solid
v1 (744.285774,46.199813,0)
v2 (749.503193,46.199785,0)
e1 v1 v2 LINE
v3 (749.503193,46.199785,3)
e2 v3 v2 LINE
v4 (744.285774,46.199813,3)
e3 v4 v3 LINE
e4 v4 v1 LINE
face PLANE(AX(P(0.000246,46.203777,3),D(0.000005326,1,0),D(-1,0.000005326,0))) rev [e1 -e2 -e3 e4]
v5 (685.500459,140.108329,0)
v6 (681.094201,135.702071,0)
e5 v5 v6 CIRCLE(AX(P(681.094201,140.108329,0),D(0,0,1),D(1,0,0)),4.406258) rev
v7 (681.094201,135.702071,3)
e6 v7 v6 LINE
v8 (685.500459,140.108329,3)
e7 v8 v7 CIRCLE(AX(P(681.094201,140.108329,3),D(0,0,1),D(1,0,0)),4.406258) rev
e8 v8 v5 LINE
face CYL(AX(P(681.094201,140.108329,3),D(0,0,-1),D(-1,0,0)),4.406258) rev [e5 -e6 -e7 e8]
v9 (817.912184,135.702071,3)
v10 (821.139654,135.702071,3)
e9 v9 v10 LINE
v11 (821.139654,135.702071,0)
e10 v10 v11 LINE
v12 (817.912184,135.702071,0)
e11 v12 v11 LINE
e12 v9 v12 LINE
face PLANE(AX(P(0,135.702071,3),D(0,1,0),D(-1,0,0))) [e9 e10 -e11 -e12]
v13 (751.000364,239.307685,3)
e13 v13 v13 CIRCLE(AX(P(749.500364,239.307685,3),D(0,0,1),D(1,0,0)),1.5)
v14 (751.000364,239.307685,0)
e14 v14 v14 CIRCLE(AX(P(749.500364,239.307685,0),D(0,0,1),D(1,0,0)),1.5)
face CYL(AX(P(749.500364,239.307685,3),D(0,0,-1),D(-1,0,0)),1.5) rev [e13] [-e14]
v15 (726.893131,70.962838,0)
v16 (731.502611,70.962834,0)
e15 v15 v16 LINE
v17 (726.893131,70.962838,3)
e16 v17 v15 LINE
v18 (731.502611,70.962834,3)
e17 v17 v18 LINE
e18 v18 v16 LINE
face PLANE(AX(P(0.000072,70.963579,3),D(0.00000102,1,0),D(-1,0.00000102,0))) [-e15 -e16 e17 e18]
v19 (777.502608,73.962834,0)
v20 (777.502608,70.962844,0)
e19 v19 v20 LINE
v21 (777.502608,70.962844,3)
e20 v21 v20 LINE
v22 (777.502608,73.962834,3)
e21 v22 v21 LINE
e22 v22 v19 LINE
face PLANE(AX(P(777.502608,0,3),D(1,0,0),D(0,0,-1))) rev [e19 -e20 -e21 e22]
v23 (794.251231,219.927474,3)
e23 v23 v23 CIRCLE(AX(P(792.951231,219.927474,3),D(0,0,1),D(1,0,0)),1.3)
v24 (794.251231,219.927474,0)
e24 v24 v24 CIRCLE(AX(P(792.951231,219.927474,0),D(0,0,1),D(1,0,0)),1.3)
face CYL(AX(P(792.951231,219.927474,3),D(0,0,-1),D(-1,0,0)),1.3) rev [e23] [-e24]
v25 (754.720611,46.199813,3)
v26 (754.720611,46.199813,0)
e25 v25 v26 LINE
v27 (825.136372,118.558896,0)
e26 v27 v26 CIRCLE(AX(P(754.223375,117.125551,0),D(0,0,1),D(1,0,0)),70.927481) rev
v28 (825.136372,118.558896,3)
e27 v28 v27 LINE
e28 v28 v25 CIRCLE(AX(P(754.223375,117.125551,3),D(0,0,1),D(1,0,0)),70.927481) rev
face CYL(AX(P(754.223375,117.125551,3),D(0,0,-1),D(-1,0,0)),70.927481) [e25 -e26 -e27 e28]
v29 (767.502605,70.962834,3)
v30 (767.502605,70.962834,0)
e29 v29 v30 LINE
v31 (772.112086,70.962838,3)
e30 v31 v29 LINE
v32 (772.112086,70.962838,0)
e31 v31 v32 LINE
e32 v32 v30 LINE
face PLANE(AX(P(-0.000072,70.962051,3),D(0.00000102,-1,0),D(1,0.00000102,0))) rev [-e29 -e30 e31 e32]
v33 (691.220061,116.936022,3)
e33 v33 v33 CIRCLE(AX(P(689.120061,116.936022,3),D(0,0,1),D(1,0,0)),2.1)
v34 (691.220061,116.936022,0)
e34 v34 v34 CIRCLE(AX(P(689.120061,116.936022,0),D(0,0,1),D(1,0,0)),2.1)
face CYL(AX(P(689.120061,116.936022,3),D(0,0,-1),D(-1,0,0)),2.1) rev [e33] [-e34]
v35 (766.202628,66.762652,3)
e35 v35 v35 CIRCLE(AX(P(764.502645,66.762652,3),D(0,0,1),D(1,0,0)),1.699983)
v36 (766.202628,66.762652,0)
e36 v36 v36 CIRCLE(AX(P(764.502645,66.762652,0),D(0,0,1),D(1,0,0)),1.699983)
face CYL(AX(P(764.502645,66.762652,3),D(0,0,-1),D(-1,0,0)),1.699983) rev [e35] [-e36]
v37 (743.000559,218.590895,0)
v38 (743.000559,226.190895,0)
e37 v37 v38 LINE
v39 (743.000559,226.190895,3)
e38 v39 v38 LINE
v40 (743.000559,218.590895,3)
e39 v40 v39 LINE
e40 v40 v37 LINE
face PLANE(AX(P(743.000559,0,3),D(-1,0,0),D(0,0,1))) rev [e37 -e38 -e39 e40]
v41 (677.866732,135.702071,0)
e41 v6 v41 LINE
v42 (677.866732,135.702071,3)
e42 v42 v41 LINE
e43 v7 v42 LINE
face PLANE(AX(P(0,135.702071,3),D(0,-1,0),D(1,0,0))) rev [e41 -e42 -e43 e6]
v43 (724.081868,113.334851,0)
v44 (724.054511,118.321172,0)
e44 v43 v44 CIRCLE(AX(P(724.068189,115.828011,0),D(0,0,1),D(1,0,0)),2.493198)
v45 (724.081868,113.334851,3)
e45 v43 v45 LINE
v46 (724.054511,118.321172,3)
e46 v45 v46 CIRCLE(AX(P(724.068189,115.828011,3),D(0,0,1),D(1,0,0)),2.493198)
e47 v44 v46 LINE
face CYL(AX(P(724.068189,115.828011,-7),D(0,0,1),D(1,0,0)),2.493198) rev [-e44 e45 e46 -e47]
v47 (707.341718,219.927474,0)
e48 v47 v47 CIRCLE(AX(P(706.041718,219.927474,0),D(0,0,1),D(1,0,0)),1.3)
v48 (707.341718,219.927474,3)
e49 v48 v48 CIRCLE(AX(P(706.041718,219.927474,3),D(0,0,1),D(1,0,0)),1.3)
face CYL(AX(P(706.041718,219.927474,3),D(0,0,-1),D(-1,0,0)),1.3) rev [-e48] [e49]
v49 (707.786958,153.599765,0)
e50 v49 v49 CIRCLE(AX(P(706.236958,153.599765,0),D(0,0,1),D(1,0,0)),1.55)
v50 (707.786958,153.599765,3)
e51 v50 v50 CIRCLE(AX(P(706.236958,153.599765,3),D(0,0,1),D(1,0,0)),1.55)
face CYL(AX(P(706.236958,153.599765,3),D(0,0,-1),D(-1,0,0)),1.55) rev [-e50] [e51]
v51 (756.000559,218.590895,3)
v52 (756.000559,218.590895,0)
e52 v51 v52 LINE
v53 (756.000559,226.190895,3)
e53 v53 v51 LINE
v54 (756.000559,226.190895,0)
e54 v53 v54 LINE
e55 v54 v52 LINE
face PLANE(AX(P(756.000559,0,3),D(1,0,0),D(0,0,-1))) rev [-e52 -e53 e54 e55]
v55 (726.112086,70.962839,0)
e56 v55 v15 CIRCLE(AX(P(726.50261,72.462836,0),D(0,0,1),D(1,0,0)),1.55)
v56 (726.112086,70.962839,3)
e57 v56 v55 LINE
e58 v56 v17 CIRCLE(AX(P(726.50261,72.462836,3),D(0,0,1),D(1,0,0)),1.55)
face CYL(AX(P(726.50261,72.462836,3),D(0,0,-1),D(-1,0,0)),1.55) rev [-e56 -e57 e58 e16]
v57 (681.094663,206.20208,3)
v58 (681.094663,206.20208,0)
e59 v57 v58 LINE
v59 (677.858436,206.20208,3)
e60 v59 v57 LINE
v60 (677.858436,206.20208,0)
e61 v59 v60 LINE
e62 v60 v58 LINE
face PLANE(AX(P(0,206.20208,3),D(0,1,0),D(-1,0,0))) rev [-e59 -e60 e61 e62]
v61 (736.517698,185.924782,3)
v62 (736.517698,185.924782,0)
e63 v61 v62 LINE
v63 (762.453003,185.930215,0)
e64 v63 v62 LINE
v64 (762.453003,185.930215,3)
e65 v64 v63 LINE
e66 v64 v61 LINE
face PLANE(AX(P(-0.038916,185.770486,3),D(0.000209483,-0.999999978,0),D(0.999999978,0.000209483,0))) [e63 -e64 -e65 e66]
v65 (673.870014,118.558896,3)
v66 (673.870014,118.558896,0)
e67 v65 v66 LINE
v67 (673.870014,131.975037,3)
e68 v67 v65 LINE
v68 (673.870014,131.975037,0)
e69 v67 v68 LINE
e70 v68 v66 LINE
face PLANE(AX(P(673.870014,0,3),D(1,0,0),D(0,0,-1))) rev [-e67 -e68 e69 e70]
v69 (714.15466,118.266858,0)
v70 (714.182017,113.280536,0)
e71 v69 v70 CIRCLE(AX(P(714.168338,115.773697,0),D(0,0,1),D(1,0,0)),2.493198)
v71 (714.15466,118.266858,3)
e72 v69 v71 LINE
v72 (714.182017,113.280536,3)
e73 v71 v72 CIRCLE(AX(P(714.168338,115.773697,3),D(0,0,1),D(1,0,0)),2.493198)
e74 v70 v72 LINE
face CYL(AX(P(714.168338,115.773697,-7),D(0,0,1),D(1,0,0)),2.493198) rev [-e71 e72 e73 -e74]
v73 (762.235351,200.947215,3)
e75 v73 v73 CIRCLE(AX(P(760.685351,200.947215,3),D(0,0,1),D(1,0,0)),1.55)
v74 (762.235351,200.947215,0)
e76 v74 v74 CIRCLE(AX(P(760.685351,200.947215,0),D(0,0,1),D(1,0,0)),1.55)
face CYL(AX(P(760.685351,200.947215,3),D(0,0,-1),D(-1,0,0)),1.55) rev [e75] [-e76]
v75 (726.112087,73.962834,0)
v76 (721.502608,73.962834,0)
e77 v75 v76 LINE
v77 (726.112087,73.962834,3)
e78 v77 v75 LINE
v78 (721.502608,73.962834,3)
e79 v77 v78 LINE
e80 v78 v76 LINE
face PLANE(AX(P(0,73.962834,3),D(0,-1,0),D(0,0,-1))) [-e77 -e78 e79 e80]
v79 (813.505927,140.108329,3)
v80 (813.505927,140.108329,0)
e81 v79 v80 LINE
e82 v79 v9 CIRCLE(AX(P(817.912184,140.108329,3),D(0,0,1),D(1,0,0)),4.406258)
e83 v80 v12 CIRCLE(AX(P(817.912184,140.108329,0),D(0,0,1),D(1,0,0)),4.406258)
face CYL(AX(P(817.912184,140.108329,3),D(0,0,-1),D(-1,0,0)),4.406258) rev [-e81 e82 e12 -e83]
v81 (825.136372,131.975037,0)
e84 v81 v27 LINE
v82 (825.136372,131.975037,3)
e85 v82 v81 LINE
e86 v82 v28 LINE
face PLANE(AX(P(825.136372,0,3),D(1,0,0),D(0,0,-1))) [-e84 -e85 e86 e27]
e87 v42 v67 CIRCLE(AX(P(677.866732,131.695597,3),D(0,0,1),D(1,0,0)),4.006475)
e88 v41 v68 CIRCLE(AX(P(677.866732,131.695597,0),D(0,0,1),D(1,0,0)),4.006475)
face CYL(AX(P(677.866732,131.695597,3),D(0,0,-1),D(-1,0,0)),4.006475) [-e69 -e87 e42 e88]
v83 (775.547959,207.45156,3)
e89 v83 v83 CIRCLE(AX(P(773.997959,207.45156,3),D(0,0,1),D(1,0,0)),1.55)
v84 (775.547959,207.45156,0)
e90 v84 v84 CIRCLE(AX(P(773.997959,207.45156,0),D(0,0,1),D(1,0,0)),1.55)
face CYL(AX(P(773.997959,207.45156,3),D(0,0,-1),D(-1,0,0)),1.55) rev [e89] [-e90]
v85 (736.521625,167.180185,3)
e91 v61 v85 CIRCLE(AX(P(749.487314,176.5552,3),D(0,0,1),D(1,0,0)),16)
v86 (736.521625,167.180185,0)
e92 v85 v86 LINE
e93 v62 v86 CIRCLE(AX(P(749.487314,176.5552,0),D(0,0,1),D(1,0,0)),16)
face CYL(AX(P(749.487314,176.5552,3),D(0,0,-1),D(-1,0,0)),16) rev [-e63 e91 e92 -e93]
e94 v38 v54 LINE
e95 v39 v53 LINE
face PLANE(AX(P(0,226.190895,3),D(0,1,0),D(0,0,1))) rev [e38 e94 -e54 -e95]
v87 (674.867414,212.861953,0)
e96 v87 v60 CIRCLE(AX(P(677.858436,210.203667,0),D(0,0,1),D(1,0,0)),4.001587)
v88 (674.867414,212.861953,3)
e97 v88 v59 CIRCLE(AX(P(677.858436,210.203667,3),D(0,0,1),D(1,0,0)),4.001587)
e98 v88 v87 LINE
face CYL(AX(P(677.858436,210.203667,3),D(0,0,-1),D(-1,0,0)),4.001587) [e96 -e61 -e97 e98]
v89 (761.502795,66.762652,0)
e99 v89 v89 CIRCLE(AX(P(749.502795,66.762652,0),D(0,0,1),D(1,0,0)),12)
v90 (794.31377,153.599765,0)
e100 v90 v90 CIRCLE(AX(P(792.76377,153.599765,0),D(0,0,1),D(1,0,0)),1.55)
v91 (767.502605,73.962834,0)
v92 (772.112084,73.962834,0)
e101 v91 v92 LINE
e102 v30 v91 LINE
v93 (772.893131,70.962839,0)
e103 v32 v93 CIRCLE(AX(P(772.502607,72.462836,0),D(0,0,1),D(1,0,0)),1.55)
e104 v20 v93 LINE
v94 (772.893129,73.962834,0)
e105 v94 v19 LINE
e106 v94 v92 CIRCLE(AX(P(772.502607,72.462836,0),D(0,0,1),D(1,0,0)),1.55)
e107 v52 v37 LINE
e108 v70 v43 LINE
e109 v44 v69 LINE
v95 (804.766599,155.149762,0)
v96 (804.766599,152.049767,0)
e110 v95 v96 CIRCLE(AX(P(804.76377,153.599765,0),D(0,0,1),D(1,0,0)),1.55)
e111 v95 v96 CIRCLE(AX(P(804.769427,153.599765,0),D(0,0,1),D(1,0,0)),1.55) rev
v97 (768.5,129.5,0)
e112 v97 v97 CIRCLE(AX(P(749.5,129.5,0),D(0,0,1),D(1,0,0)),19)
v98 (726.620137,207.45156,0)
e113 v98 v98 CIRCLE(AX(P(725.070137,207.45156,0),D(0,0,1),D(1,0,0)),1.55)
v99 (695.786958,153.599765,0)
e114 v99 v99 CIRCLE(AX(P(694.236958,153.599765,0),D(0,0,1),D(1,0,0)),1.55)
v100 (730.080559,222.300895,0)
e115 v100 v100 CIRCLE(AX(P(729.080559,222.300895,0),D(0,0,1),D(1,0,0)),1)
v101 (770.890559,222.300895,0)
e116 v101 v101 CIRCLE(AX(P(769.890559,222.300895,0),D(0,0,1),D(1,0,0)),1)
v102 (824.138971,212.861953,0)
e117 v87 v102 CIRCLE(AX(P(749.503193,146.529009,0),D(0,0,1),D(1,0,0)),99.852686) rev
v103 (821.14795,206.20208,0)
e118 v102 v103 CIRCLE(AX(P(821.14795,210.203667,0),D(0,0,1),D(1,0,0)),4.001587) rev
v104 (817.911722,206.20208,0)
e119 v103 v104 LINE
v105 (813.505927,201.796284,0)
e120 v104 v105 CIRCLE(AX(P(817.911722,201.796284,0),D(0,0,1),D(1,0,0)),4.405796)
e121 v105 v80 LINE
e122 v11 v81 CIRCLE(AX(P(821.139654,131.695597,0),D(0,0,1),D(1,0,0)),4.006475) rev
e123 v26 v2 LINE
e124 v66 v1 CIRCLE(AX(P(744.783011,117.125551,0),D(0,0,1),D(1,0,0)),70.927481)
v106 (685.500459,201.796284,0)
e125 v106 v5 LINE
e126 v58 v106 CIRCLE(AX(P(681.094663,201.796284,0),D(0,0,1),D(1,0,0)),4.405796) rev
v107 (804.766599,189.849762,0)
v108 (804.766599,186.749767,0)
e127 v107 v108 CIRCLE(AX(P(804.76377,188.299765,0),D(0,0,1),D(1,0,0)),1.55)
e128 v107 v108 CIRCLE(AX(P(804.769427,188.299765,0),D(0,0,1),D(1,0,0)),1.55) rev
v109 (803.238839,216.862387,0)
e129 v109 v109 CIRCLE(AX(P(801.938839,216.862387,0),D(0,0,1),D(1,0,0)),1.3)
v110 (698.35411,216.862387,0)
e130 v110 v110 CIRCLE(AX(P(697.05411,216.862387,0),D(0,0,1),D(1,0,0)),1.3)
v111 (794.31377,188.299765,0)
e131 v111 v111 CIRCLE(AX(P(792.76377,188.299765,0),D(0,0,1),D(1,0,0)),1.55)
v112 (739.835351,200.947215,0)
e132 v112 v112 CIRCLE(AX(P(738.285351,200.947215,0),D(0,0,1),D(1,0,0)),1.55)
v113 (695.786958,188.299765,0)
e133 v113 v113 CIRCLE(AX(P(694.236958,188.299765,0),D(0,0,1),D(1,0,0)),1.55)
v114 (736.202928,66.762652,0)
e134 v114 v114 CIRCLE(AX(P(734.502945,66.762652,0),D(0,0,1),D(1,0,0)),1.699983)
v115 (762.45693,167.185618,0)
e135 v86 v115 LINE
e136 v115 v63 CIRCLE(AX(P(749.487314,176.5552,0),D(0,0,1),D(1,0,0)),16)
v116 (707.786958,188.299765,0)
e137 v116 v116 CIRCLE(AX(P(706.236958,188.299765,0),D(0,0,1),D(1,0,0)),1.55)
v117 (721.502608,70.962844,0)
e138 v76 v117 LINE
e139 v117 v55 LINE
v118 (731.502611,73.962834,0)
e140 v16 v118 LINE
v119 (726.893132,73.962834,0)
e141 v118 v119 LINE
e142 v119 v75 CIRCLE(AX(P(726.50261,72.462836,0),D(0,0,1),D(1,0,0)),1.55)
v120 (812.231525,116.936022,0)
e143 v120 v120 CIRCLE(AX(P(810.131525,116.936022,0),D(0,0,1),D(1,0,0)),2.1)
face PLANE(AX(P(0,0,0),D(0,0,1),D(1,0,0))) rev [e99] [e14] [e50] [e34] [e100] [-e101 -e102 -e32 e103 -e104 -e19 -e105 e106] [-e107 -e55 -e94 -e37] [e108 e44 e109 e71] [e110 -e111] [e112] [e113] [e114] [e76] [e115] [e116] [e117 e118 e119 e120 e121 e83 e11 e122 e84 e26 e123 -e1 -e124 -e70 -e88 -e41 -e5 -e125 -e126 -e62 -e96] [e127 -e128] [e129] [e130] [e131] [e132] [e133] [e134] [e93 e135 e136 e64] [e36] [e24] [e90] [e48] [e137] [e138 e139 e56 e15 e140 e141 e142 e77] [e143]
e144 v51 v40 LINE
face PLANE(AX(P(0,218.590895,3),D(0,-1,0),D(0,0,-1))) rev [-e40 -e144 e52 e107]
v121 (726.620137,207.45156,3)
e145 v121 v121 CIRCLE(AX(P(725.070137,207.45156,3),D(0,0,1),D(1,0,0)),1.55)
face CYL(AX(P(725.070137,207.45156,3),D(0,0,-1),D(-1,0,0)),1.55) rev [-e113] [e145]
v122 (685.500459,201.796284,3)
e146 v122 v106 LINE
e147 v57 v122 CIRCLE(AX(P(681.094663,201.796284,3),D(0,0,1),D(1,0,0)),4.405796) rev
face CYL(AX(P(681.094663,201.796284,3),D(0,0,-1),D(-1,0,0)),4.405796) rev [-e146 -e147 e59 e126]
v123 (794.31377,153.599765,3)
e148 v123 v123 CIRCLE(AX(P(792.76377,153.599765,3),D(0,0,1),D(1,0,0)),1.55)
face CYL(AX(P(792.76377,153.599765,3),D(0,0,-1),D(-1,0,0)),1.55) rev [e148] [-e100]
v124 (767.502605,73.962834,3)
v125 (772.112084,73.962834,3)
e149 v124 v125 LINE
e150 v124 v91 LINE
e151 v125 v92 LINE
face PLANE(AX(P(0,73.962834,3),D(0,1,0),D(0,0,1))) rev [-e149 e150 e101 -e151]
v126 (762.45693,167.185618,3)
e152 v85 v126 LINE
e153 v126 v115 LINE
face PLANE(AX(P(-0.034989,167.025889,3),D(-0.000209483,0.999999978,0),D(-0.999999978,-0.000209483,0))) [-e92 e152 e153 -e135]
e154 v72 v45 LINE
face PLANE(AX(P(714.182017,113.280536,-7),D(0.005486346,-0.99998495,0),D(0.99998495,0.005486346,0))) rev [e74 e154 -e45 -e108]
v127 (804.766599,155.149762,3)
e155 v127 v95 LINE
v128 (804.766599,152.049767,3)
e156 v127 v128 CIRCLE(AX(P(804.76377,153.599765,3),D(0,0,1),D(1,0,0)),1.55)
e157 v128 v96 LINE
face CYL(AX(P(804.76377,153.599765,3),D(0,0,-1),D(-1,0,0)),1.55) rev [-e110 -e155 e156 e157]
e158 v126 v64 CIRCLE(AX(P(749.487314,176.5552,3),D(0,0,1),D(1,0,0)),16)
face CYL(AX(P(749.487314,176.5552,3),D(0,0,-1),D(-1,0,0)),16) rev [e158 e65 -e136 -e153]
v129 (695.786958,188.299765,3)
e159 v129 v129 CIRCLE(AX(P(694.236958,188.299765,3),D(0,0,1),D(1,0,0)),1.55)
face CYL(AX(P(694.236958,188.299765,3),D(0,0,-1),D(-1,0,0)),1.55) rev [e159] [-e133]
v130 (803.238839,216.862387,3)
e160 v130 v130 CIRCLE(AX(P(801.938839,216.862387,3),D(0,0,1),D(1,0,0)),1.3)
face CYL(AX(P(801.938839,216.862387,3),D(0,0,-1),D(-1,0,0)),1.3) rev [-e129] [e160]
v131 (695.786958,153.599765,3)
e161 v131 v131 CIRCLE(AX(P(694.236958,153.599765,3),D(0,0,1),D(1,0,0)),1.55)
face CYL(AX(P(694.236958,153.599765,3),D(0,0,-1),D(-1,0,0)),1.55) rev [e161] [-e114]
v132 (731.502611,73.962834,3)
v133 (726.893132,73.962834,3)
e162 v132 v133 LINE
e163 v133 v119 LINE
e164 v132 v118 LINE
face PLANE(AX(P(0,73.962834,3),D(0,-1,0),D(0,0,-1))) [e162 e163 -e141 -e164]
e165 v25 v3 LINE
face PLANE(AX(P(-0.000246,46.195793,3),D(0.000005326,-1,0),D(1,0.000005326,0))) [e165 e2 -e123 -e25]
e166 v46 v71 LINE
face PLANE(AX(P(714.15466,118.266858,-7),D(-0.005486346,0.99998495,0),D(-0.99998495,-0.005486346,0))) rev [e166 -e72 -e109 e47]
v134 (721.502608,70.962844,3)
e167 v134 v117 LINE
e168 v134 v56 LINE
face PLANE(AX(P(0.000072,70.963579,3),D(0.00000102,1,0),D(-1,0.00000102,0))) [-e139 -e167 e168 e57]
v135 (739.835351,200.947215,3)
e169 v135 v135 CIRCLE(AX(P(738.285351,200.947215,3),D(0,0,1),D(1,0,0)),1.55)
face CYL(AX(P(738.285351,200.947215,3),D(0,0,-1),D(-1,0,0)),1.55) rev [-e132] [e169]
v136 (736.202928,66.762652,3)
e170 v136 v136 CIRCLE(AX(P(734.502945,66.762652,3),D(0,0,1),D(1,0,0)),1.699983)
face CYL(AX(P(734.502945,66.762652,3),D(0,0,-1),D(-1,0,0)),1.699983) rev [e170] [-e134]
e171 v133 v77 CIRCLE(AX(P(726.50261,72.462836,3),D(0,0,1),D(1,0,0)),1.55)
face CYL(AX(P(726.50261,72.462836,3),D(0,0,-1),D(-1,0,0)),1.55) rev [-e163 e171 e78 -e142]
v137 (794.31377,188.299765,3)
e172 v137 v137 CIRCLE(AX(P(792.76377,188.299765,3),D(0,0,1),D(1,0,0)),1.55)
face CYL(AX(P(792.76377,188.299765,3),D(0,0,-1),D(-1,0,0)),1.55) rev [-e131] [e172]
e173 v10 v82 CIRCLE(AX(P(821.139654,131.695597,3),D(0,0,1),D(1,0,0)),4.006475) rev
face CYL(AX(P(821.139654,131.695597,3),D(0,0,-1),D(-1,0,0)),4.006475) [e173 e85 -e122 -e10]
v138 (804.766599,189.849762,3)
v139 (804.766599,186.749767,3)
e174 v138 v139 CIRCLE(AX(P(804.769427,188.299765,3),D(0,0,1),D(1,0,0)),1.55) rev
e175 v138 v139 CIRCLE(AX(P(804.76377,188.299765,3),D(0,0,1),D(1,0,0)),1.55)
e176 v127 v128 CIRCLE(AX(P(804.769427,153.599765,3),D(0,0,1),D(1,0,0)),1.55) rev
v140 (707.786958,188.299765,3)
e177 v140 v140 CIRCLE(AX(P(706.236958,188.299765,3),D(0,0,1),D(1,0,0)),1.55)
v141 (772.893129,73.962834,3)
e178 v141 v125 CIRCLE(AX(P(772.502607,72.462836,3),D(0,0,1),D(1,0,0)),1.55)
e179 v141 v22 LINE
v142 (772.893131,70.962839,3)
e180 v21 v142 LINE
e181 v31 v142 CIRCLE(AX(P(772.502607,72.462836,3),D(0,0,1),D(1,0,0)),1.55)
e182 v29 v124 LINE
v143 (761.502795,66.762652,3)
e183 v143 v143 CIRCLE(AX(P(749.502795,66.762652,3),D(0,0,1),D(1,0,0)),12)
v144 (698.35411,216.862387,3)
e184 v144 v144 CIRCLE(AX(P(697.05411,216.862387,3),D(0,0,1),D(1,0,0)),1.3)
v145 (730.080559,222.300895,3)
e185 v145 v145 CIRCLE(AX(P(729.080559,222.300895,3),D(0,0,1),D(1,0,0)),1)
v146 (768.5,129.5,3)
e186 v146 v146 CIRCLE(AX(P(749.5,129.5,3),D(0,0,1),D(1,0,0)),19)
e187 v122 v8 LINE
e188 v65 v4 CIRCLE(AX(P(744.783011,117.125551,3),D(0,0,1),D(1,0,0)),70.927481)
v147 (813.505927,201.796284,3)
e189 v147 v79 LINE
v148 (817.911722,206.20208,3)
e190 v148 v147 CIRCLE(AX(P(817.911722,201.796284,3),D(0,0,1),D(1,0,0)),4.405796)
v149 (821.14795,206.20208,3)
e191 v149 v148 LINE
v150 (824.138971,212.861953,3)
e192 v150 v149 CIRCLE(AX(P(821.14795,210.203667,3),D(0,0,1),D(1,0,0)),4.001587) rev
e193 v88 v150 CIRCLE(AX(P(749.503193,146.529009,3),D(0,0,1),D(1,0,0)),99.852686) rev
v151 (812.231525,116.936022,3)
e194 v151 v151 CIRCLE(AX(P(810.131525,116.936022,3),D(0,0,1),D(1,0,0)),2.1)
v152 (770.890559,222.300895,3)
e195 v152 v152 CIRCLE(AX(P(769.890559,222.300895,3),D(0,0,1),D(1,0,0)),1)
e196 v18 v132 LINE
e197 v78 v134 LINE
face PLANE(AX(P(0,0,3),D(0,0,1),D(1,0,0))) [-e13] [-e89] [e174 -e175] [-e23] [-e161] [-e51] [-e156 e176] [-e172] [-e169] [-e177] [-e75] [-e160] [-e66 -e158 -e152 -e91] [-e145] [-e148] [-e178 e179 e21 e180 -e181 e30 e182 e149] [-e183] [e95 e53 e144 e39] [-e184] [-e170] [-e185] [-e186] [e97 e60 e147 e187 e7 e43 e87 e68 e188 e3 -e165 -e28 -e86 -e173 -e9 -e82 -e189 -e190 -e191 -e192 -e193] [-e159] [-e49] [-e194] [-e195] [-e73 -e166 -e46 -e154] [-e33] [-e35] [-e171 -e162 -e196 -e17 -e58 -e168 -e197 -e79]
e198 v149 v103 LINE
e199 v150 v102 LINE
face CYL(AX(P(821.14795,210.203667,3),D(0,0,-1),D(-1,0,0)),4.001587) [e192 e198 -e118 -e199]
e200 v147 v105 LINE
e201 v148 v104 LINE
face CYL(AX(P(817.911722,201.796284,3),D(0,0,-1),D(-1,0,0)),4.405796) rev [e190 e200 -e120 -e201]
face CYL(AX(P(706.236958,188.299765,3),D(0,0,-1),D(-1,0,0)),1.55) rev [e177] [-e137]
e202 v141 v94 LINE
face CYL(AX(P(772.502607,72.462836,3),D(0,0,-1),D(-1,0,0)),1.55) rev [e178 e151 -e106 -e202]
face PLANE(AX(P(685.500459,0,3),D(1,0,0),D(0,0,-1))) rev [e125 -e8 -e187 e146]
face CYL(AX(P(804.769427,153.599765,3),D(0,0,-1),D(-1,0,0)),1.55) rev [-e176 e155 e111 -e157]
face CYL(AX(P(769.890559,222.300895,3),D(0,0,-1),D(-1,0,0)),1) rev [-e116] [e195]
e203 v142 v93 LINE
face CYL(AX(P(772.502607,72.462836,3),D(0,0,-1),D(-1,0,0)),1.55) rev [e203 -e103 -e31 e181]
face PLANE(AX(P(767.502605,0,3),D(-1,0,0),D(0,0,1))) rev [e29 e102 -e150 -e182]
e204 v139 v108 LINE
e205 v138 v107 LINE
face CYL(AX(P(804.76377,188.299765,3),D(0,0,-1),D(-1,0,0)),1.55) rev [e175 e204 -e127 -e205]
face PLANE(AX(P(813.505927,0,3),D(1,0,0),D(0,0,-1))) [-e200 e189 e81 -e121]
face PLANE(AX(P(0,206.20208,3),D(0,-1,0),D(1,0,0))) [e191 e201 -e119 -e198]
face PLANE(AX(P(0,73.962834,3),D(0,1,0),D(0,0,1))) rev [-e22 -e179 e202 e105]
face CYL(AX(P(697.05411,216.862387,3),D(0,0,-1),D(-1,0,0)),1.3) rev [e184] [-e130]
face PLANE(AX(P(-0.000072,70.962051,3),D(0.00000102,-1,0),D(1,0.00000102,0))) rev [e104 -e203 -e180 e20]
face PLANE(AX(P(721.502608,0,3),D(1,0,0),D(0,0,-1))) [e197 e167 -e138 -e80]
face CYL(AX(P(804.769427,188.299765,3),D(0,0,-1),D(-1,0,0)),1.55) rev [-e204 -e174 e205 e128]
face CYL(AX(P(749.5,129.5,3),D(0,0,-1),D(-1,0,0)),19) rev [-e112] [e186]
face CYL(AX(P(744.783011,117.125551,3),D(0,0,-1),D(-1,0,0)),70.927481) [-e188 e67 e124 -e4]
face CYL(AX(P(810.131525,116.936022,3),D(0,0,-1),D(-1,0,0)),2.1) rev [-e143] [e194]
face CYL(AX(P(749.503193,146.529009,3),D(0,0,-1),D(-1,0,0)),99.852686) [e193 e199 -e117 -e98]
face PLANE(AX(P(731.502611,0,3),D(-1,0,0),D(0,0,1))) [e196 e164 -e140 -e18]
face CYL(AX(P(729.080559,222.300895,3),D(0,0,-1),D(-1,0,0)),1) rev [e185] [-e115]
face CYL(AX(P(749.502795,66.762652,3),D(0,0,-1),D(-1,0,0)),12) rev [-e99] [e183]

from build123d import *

# Parameters (mm, degrees)
STOCK_ACRYLIC_PARTS_1_OUTLINE_R   = 1.699983
STOCK_ACRYLIC_PARTS_1_OUTLINE_R_2 = 12
STOCK_ACRYLIC_PARTS_1_OUTLINE_R_3 = 2.1
STOCK_ACRYLIC_PARTS_1_OUTLINE_R_4 = 19
STOCK_ACRYLIC_PARTS_1_OUTLINE_R_5 = 1.55
STOCK_ACRYLIC_PARTS_1_OUTLINE_R_6 = 1.3
STOCK_ACRYLIC_PARTS_1_OUTLINE_R_7 = 1
STOCK_ACRYLIC_PARTS_1_OUTLINE_W   = 13
STOCK_ACRYLIC_PARTS_1_OUTLINE_H   = 7.6
STOCK_ACRYLIC_PARTS_1_OUTLINE_R_8 = 1.5
STOCK_ACRYLIC_PARTS_1_DEPTH       = 3
CUT_EXTRUDE1_DEPTH                = 10


# Read off the part's stored shape, not the designer's step: Stock-acrylic parts-1
with BuildPart() as part:
    # Stock-acrylic parts-1 outline → Stock-acrylic parts-1 (new body)
    with BuildSketch(Plane.XY):
        with BuildLine():
            ThreePointArc((821.147949544, 206.202079658), (824.798296467, 208.564256212), (824.138971465, 212.861953418))
            ThreePointArc((824.138971465, 212.861953418), (749.503192804, 246.381695406), (674.867414142, 212.861953418))
            ThreePointArc((674.867414142, 212.861953418), (674.208089141, 208.564256212), (677.858436064, 206.202079658))
            Line((677.858436064, 206.202079658), (681.094663275, 206.202079658))
            ThreePointArc((681.094663275, 206.202079658), (684.210031262, 204.911651986), (685.500458934, 201.796283999))
            Line((685.500458934, 201.796283999), (685.500458934, 140.108329038))
            ThreePointArc((685.500458934, 140.108329038), (684.209895956, 136.992634392), (681.09420131, 135.702071414))
            Line((681.09420131, 135.702071414), (677.866731501, 135.702071414))
            ThreePointArc((677.866731501, 135.702071414), (675.134308532, 134.625733906), (673.870013854, 131.975036511))
            Line((673.870013854, 131.975036511), (673.870013854, 118.558895729))
            ThreePointArc((673.870013854, 118.558895729), (693.951774589, 67.659471727), (744.285774281, 46.199812992))
            Line((744.285774281, 46.199812992), (749.503192804, 46.199785203))
            Line((749.503192804, 46.199785203), (754.720611326, 46.199812992))
            ThreePointArc((754.720611326, 46.199812992), (805.054611018, 67.659471727), (825.136371753, 118.558895729))
            Line((825.136371753, 118.558895729), (825.136371753, 131.975036511))
            ThreePointArc((825.136371753, 131.975036511), (823.872077075, 134.625733906), (821.139654106, 135.702071414))
            Line((821.139654106, 135.702071414), (817.912184297, 135.702071414))
            ThreePointArc((817.912184297, 135.702071414), (814.796489652, 136.992634392), (813.505926674, 140.108329038))
            Line((813.505926674, 140.108329038), (813.505926674, 201.796283999))
            ThreePointArc((813.505926674, 201.796283999), (814.796354345, 204.911651986), (817.911722332, 206.202079658))
            Line((817.911722332, 206.202079658), (821.147949544, 206.202079658))
        make_face()
        with Locations((734.502945377, 66.762651685)):
            Circle(STOCK_ACRYLIC_PARTS_1_OUTLINE_R, mode=Mode.SUBTRACT)
        with Locations((749.502795377, 66.762651685)):
            Circle(STOCK_ACRYLIC_PARTS_1_OUTLINE_R_2, mode=Mode.SUBTRACT)
        with BuildLine():
            Line((721.50260823, 73.962833599), (726.112087485, 73.962833599))
            ThreePointArc((726.112087485, 73.962833599), (726.502609759, 74.012836148), (726.893132033, 73.962833599))
            Line((726.893132033, 73.962833599), (731.502611288, 73.962833599))
            Line((731.502611288, 73.962833599), (731.502611288, 70.962833599))
            Line((731.502611288, 70.962833599), (726.893130503, 70.962838298))
            ThreePointArc((726.893130503, 70.962838298), (726.502608179, 70.912836148), (726.112085956, 70.962839094))
            Line((726.112085956, 70.962839094), (721.50260823, 70.962843794))
            Line((721.50260823, 70.962843794), (721.50260823, 73.962833599))
        make_face(mode=Mode.SUBTRACT)
        with Locations((689.120060972, 116.936022379)):
            Circle(STOCK_ACRYLIC_PARTS_1_OUTLINE_R_3, mode=Mode.SUBTRACT)
        with Locations((749.5, 129.5)):
            Circle(STOCK_ACRYLIC_PARTS_1_OUTLINE_R_4, mode=Mode.SUBTRACT)
        with Locations((764.502645377, 66.762651685)):
            Circle(STOCK_ACRYLIC_PARTS_1_OUTLINE_R, mode=Mode.SUBTRACT)
        with BuildLine():
            Line((767.502605171, 73.962833599), (772.112084426, 73.962833599))
            ThreePointArc((772.112084426, 73.962833599), (772.5026067, 74.012836148), (772.893128974, 73.962833599))
            Line((772.893128974, 73.962833599), (777.50260823, 73.962833599))
            Line((777.50260823, 73.962833599), (777.50260823, 70.962843794))
            Line((777.50260823, 70.962843794), (772.893130503, 70.962839094))
            ThreePointArc((772.893130503, 70.962839094), (772.50260828, 70.912836148), (772.112085956, 70.962838298))
            Line((772.112085956, 70.962838298), (767.502605171, 70.962833599))
            Line((767.502605171, 70.962833599), (767.502605171, 73.962833599))
        make_face(mode=Mode.SUBTRACT)
        with Locations((810.131525065, 116.936022379)):
            Circle(STOCK_ACRYLIC_PARTS_1_OUTLINE_R_3, mode=Mode.SUBTRACT)
        with Locations((694.236958178, 153.599764702)):
            Circle(STOCK_ACRYLIC_PARTS_1_OUTLINE_R_5, mode=Mode.SUBTRACT)
        with Locations((706.236958178, 153.599764702)):
            Circle(STOCK_ACRYLIC_PARTS_1_OUTLINE_R_5, mode=Mode.SUBTRACT)
        with Locations((694.236958178, 188.299764702)):
            Circle(STOCK_ACRYLIC_PARTS_1_OUTLINE_R_5, mode=Mode.SUBTRACT)
        with Locations((706.236958178, 188.299764702)):
            Circle(STOCK_ACRYLIC_PARTS_1_OUTLINE_R_5, mode=Mode.SUBTRACT)
        with BuildLine():
            Line((762.456929776, 167.185618031), (736.521624913, 167.180185031))
            ThreePointArc((736.521624913, 167.180185031), (733.487314362, 176.5518483), (736.51769824, 185.924782019))
            Line((736.51769824, 185.924782019), (762.453003098, 185.930215033))
            ThreePointArc((762.453003098, 185.930215033), (765.487313655, 176.558551758), (762.456929776, 167.185618031))
        make_face(mode=Mode.SUBTRACT)
        with Locations((697.05410976, 216.862387)):
            Circle(STOCK_ACRYLIC_PARTS_1_OUTLINE_R_6, mode=Mode.SUBTRACT)
        with Locations((706.041717574, 219.927474111)):
            Circle(STOCK_ACRYLIC_PARTS_1_OUTLINE_R_6, mode=Mode.SUBTRACT)
        with Locations((725.070137431, 207.45155957)):
            Circle(STOCK_ACRYLIC_PARTS_1_OUTLINE_R_5, mode=Mode.SUBTRACT)
        with Locations((738.285350665, 200.947214569)):
            Circle(STOCK_ACRYLIC_PARTS_1_OUTLINE_R_5, mode=Mode.SUBTRACT)
        with Locations((729.080559, 222.300895)):
            Circle(STOCK_ACRYLIC_PARTS_1_OUTLINE_R_7, mode=Mode.SUBTRACT)
        with Locations((749.500559, 222.390895)):
            Rectangle(STOCK_ACRYLIC_PARTS_1_OUTLINE_W, STOCK_ACRYLIC_PARTS_1_OUTLINE_H, mode=Mode.SUBTRACT)
        with Locations((749.500364247, 239.307685207)):
            Circle(STOCK_ACRYLIC_PARTS_1_OUTLINE_R_8, mode=Mode.SUBTRACT)
        with Locations((792.763770316, 153.599764702)):
            Circle(STOCK_ACRYLIC_PARTS_1_OUTLINE_R_5, mode=Mode.SUBTRACT)
        with BuildLine():
            ThreePointArc((804.766598873, 155.149762121), (806.31942743, 153.599764702), (804.766598873, 152.049767283))
            ThreePointArc((804.766598873, 152.049767283), (803.213770316, 153.599764702), (804.766598873, 155.149762121))
        make_face(mode=Mode.SUBTRACT)
        with Locations((792.763770316, 188.299764702)):
            Circle(STOCK_ACRYLIC_PARTS_1_OUTLINE_R_5, mode=Mode.SUBTRACT)
        with BuildLine():
            ThreePointArc((804.766598873, 189.849762121), (806.31942743, 188.299764702), (804.766598873, 186.749767283))
            ThreePointArc((804.766598873, 186.749767283), (803.213770316, 188.299764702), (804.766598873, 189.849762121))
        make_face(mode=Mode.SUBTRACT)
        with Locations((760.685350665, 200.947214569)):
            Circle(STOCK_ACRYLIC_PARTS_1_OUTLINE_R_5, mode=Mode.SUBTRACT)
        with Locations((773.997959275, 207.45155957)):
            Circle(STOCK_ACRYLIC_PARTS_1_OUTLINE_R_5, mode=Mode.SUBTRACT)
        with Locations((769.890559, 222.300895)):
            Circle(STOCK_ACRYLIC_PARTS_1_OUTLINE_R_7, mode=Mode.SUBTRACT)
        with Locations((792.951231186, 219.927474111)):
            Circle(STOCK_ACRYLIC_PARTS_1_OUTLINE_R_6, mode=Mode.SUBTRACT)
        with Locations((801.938839, 216.862387)):
            Circle(STOCK_ACRYLIC_PARTS_1_OUTLINE_R_6, mode=Mode.SUBTRACT)
    extrude(amount=STOCK_ACRYLIC_PARTS_1_DEPTH)

    # Sketch1 → Cut-Extrude1 (cut)
    with BuildSketch(Plane.XY.offset(3)):
        with BuildLine():
            Line((714.154659638, 118.266857616), (724.054510642, 118.321172443))
            ThreePointArc((724.054510642, 118.321172443), (726.561350155, 115.841690031), (724.081867742, 113.334850517))
            Line((724.081867742, 113.334850517), (714.182016738, 113.28053569))
            ThreePointArc((714.182016738, 113.28053569), (711.675177225, 115.760018102), (714.154659638, 118.266857616))
        make_face()
    extrude(amount=-CUT_EXTRUDE1_DEPTH, mode=Mode.SUBTRACT)


solid = part.part
